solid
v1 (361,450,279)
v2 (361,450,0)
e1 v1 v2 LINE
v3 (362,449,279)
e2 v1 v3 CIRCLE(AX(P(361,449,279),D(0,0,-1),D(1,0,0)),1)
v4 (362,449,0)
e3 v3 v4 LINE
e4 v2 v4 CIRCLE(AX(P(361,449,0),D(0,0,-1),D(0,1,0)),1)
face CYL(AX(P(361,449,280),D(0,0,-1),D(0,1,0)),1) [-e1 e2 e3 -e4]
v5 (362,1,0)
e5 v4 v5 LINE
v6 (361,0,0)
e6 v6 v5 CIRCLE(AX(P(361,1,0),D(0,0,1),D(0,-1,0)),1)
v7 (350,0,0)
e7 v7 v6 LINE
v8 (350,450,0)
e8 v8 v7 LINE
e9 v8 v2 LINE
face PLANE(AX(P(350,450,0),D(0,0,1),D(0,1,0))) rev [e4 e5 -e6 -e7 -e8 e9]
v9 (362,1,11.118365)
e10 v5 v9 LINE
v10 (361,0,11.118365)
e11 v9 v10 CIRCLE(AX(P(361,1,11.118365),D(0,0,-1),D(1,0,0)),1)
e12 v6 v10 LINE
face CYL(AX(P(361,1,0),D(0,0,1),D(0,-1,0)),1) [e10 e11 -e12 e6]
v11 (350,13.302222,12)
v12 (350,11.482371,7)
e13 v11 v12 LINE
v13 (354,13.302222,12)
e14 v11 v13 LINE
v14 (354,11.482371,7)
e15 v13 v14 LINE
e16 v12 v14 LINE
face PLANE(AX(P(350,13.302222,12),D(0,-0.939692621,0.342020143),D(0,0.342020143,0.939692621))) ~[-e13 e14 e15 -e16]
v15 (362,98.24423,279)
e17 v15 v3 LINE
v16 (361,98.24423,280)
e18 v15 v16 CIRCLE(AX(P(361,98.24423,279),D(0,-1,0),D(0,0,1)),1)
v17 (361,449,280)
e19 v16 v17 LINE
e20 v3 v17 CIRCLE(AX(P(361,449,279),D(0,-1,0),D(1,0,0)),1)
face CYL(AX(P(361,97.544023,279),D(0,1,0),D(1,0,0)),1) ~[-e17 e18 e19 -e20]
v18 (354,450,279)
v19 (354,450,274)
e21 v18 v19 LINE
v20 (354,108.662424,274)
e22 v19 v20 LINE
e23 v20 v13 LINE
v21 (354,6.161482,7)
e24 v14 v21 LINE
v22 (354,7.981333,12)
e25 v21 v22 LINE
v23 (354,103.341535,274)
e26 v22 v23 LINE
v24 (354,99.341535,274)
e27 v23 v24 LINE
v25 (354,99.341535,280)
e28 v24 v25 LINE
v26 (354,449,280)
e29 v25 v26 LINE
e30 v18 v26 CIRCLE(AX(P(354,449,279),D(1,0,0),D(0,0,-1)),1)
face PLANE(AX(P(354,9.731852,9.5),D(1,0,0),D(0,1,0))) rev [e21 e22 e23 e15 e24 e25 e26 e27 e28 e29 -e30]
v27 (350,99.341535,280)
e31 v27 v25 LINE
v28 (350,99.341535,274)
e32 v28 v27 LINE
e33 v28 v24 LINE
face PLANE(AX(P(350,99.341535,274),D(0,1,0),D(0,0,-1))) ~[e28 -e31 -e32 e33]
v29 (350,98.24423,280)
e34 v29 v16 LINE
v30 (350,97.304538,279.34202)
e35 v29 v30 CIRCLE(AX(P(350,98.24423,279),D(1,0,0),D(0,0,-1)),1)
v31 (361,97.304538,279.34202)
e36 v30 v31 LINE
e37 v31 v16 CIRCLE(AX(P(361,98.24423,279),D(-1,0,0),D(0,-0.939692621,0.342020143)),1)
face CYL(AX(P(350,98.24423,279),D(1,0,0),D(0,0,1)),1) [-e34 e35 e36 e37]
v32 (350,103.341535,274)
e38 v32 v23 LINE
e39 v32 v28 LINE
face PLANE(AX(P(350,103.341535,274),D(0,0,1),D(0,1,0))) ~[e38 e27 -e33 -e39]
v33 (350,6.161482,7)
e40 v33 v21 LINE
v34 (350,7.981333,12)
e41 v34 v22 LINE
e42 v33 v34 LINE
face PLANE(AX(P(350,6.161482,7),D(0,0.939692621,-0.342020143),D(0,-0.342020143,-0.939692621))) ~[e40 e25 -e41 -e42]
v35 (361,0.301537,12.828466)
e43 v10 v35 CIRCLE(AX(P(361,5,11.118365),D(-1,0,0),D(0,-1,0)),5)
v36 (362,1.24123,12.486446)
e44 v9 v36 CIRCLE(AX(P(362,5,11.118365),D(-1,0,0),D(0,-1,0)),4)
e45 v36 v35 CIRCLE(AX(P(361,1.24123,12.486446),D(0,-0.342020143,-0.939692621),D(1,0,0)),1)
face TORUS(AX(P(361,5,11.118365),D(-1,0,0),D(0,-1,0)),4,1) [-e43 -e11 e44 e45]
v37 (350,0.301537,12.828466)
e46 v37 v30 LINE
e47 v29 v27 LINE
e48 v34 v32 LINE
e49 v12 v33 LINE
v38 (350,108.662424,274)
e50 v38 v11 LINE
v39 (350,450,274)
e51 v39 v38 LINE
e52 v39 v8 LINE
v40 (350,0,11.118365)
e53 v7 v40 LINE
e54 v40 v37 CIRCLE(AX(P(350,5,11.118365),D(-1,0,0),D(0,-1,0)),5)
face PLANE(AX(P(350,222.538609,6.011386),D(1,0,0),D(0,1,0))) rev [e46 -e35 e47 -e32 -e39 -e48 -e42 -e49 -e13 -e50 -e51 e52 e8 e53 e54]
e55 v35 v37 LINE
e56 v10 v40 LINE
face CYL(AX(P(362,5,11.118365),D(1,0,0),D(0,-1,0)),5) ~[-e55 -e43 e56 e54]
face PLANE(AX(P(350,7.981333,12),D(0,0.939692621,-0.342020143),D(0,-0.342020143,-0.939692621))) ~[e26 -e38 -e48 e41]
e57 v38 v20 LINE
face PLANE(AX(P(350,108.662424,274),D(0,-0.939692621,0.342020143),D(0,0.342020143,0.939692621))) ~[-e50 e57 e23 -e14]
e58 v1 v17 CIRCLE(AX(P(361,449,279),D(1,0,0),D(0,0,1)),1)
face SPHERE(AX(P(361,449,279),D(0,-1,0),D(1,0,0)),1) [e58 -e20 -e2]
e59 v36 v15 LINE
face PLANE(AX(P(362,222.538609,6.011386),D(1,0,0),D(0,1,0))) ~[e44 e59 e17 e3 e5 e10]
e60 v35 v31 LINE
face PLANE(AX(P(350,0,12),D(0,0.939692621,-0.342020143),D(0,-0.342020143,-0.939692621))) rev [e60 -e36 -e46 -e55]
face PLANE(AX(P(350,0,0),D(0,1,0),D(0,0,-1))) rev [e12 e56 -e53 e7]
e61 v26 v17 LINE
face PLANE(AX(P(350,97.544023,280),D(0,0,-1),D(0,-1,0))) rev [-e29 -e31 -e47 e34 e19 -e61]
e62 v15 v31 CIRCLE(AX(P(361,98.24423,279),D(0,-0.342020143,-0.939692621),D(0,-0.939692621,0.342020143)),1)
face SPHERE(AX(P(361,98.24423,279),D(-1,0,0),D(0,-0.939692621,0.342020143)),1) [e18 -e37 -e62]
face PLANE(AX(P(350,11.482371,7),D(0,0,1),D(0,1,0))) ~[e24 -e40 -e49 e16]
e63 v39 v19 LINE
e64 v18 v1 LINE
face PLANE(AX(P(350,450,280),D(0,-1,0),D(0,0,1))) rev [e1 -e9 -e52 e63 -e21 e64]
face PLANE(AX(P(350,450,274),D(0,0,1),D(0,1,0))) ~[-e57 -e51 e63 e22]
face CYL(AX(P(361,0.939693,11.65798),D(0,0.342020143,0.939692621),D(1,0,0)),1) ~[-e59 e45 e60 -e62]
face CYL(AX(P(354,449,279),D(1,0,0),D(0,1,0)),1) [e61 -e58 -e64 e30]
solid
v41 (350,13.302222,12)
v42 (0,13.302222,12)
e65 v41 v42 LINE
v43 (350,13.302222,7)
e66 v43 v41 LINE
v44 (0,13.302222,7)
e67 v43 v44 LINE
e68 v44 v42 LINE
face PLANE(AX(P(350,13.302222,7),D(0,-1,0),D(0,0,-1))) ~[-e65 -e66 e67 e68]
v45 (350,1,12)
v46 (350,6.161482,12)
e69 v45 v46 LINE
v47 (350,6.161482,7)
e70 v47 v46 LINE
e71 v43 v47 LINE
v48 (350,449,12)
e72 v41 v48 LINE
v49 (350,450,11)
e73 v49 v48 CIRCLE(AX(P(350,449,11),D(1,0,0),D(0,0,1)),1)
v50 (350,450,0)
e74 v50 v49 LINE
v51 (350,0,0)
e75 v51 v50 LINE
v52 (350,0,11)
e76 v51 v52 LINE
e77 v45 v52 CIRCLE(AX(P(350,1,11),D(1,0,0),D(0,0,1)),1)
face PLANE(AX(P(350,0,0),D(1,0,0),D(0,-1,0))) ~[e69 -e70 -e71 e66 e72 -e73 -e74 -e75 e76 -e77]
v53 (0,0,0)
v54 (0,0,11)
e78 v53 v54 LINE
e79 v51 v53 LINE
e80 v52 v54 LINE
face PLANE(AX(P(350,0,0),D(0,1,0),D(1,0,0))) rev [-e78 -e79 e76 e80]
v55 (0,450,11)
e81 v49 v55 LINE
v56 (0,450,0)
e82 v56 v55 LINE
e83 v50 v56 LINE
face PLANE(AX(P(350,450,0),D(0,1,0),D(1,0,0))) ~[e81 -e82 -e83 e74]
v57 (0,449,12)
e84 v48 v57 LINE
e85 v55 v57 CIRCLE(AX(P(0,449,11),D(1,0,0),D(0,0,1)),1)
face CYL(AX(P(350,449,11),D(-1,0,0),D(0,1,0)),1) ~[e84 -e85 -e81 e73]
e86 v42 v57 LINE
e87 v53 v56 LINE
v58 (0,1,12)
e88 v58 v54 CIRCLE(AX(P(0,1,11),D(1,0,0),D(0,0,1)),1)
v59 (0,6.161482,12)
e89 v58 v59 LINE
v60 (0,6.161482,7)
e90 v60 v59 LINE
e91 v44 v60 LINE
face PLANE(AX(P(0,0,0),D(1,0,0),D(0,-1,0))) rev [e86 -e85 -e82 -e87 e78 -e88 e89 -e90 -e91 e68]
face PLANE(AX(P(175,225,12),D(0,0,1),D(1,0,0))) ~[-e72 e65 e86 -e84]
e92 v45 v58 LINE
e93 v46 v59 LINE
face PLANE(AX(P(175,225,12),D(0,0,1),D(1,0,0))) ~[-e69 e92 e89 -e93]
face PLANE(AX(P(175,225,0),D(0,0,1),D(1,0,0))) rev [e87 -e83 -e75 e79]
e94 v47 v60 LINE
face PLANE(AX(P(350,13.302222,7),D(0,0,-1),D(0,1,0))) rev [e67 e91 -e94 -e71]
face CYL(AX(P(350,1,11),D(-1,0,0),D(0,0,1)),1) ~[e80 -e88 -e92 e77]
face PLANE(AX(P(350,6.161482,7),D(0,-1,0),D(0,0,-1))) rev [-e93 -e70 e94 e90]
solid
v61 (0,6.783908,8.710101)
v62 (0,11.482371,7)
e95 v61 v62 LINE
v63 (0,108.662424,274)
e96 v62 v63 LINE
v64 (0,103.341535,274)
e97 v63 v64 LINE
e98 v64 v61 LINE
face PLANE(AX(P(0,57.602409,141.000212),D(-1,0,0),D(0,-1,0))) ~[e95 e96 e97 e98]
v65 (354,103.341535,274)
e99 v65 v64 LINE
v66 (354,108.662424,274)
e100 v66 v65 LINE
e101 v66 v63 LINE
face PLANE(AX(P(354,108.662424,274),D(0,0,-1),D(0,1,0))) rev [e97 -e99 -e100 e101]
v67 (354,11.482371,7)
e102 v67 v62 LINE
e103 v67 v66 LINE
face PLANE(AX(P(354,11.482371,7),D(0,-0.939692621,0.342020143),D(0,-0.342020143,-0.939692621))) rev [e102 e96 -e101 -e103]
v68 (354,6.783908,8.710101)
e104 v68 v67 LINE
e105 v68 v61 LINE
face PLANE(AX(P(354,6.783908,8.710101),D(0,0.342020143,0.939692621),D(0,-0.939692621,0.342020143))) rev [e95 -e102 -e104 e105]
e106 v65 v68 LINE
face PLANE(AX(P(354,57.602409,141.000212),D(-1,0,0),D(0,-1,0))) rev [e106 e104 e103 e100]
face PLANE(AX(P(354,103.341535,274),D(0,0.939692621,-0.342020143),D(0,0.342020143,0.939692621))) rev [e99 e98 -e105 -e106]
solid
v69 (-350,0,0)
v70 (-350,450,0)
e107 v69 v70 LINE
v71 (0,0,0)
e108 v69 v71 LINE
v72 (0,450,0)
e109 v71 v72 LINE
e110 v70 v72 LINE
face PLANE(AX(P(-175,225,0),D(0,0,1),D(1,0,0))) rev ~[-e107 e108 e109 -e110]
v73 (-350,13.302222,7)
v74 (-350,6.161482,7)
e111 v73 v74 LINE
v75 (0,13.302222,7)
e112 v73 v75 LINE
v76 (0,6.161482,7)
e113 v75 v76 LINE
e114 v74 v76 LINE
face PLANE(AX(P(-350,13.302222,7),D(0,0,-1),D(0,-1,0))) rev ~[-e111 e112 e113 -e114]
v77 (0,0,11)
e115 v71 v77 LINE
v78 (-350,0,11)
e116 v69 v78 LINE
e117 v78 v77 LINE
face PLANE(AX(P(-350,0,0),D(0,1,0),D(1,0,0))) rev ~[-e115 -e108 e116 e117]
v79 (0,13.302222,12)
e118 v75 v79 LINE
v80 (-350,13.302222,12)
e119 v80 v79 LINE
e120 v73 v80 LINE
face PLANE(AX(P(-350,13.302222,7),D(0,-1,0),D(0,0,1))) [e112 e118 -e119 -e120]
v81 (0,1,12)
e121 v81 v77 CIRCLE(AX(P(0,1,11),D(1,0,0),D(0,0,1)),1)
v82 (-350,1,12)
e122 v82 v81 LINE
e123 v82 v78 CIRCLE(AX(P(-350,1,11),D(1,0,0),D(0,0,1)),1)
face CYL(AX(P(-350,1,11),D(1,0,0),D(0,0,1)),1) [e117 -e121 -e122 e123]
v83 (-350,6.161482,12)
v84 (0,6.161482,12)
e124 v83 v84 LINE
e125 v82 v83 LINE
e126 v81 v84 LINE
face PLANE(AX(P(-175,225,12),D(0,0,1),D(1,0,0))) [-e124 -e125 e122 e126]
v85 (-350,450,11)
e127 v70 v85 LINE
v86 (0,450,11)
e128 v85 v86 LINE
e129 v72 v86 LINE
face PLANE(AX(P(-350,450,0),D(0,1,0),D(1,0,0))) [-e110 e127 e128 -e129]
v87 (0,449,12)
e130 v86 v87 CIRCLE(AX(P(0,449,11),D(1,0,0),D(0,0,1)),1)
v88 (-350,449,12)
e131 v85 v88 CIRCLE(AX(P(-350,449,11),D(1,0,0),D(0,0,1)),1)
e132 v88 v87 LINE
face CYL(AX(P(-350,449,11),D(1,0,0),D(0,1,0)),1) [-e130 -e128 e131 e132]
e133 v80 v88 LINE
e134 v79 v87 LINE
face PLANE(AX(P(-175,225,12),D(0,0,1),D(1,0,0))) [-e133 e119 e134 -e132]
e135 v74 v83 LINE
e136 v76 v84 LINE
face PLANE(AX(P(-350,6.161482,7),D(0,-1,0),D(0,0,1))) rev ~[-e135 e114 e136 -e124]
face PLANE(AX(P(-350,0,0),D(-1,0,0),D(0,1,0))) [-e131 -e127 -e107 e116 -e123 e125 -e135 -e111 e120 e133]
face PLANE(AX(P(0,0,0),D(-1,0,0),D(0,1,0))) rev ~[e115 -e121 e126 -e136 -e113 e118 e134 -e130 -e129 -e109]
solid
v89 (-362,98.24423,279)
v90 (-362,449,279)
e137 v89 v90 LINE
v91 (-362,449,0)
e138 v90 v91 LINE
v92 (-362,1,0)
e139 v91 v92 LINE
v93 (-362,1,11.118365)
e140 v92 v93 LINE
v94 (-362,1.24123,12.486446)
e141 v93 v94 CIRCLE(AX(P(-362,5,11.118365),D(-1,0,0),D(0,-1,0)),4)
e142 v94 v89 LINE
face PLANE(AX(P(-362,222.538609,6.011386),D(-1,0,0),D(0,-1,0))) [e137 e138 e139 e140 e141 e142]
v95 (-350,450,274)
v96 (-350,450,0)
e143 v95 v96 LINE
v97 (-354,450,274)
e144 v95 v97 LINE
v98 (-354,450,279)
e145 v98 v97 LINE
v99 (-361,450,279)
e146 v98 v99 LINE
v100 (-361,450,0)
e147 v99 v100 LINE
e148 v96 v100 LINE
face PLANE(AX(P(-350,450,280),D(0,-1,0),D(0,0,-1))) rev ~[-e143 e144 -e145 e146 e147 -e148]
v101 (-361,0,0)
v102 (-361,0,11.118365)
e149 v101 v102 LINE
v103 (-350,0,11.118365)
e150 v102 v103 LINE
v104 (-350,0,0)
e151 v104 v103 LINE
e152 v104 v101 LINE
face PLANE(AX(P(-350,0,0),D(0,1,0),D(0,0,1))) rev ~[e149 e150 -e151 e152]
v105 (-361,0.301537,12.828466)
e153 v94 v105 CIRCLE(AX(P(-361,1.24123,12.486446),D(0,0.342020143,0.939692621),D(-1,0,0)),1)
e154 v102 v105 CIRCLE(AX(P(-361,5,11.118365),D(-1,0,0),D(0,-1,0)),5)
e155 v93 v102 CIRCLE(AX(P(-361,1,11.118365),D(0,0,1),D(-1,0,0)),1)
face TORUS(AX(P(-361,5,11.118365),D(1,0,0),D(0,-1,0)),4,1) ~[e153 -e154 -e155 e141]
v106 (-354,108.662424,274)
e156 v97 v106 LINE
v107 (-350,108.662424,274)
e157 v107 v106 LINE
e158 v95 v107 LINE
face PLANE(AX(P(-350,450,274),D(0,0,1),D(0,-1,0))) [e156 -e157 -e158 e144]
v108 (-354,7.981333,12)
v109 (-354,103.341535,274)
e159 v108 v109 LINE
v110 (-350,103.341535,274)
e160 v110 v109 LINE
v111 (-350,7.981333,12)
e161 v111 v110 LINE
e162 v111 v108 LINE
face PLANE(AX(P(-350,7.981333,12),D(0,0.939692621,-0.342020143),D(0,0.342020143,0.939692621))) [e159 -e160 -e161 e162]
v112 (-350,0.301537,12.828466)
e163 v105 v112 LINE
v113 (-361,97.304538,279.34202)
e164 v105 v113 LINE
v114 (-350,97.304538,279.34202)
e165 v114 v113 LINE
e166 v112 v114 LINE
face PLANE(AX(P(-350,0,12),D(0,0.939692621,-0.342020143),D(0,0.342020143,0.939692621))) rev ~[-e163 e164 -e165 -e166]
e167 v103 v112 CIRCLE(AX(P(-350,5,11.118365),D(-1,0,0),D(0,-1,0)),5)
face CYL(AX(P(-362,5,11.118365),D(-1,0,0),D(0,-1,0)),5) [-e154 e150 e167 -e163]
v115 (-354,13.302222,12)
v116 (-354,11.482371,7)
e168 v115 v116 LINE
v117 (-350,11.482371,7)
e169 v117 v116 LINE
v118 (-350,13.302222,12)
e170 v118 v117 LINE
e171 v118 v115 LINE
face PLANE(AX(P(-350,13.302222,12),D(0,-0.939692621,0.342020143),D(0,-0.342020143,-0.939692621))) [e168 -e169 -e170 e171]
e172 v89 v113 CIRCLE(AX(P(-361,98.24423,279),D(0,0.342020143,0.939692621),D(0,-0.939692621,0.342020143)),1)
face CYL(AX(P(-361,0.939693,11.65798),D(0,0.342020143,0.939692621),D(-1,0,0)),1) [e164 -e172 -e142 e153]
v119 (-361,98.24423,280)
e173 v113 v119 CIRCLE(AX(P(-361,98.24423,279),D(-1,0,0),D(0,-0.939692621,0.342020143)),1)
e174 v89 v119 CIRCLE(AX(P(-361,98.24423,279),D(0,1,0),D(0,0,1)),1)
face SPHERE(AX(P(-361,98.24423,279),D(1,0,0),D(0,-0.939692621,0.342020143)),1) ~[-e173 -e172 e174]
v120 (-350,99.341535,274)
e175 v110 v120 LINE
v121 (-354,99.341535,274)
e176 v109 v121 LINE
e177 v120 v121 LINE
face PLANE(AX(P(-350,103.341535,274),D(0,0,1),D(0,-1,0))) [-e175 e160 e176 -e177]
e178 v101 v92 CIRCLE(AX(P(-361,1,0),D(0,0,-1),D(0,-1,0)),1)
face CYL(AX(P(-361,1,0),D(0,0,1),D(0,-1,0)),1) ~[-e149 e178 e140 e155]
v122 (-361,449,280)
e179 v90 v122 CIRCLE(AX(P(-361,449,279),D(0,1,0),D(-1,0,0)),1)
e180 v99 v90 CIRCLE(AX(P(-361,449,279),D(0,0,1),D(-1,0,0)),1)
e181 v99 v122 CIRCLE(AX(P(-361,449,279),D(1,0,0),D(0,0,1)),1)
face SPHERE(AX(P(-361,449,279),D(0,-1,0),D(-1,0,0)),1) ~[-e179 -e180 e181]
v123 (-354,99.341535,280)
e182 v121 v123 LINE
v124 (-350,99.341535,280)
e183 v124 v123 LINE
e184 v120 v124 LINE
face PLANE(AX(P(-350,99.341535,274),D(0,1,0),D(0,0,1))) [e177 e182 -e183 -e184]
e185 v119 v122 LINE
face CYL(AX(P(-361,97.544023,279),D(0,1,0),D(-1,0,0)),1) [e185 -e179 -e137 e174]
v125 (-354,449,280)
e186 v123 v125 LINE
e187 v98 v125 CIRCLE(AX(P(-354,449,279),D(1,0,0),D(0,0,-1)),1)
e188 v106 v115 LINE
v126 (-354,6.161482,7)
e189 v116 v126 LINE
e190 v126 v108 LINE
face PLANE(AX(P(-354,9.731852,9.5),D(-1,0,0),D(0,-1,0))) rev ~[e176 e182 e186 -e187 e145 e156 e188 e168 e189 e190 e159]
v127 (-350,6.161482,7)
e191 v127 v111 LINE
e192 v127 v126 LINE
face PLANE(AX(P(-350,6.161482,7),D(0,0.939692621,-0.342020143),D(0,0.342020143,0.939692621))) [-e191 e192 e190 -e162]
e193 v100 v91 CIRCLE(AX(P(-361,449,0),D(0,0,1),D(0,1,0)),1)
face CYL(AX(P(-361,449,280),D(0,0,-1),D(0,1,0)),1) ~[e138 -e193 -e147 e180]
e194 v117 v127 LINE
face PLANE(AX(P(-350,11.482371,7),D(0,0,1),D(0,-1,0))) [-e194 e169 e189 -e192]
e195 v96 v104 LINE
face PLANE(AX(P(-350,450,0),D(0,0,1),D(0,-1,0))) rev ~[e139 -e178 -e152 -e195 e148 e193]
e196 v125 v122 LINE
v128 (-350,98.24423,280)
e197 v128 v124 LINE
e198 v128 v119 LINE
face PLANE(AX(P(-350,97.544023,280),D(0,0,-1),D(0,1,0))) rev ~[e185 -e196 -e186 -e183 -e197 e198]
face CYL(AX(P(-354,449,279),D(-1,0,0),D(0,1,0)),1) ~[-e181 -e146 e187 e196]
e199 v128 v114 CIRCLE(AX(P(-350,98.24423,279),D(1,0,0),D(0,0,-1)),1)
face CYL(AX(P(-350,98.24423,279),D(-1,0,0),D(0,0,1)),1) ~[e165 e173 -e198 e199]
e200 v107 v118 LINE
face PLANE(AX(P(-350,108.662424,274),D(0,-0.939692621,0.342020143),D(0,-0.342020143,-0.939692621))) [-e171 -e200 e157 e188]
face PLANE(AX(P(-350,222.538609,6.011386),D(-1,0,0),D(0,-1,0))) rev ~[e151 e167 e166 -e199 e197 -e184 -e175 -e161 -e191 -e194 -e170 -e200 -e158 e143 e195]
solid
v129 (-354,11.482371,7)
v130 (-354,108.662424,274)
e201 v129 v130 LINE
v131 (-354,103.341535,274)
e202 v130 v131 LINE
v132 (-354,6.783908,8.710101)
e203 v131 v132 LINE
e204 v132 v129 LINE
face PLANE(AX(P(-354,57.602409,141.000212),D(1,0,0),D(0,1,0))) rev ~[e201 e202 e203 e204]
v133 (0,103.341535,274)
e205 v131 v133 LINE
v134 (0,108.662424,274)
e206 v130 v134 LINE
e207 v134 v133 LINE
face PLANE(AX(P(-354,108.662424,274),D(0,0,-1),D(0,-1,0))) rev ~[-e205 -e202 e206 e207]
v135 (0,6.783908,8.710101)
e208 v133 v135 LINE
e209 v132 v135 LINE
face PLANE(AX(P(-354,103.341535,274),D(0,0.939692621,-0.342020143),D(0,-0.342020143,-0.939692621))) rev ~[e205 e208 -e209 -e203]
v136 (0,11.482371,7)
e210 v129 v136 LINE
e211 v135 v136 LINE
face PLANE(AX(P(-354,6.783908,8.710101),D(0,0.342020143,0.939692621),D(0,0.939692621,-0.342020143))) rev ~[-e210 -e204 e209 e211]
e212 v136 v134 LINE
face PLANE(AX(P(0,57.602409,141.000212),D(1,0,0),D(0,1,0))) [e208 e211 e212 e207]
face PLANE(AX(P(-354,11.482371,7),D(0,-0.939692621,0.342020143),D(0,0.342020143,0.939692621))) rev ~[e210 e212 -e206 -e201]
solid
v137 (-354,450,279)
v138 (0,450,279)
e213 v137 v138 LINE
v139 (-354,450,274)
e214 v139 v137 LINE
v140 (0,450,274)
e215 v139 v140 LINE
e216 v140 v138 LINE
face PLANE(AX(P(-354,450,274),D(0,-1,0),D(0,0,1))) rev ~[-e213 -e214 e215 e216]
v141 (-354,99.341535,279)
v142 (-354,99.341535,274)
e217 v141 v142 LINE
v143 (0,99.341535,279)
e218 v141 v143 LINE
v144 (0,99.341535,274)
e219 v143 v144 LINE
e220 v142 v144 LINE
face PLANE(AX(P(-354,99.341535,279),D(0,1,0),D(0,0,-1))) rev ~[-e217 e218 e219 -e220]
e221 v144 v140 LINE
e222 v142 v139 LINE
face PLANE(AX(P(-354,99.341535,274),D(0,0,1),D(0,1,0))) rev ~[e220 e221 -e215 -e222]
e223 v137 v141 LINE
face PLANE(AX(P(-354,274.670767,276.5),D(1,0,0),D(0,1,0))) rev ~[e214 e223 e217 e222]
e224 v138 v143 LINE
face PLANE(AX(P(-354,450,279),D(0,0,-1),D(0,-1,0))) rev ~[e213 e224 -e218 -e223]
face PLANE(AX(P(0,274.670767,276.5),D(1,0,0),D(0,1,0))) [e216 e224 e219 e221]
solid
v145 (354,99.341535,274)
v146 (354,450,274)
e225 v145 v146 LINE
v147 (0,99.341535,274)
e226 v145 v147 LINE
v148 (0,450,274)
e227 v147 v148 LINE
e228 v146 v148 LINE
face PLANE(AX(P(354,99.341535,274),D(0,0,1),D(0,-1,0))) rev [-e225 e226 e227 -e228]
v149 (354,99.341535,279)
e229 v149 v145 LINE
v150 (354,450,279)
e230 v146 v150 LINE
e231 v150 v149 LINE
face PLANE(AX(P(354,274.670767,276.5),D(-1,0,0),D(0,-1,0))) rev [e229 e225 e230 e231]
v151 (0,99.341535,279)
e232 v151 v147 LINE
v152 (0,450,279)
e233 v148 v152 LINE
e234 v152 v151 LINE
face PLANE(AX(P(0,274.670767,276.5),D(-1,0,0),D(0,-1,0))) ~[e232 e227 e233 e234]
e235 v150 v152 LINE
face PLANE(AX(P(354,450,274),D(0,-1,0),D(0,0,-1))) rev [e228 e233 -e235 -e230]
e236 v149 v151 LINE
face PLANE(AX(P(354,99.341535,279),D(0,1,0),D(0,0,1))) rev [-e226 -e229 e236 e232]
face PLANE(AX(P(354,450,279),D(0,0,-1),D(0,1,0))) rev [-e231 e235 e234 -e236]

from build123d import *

# Parameters (mm, degrees)
F2_W         = 350
F2_H         = 450
F3_DEPTH     = 12
F5_DEPTH     = 12
F6_DEPTH     = 4
F8_DEPTH     = 354
F9_DEPTH     = 354
F10_W        = 7.1407400337
F10_H        = 5
F11_DEPTH    = 350.001
F12_R        = 1
F12_2_R      = 1
F13_T1_DEPTH = 14.2040872589
F13_T4_ANGLE = 20


# Not quite as in the source:
# - a fillet or chamfer that OpenCascade refuses, or shapes differently, is made with other operations: its cross-section is extruded or revolved along the edge and cut away or added


with BuildPart() as f3:
    # F2 (on Top) → F3 (new body)
    with BuildSketch(Plane.XY):
        with Locations((-175, 225)):
            Rectangle(F2_W, F2_H)
    extrude(amount=F3_DEPTH)

    # F10 (on face) → F11 (cut, through all)
    with BuildSketch(Plane(origin=(-350, 0, 0), x_dir=(0, -1, 0), z_dir=(-1, 0, 0))):
        with Locations((-9.7318521391, 9.5)):
            Rectangle(F10_W, F10_H)
    extrude(amount=-F11_DEPTH, mode=Mode.SUBTRACT)

    # F12
    f12_edges = [f3.edges().sort_by_distance(p)[0] for p in [
        (-175, 0, 12),
        (-175, 450, 12),
    ]]
    fillet(f12_edges, radius=F12_R)


with BuildPart() as f5:
    # F4 (on face) → F5 (new body)
    with BuildSketch(Plane(origin=(-350, 0, 0), x_dir=(0, -1, 0), z_dir=(-1, 0, 0))):
        Polygon((-450, 12), (-450, 0), (0, 0), (0, 12), (-7.9813332936, 12), (-6.1614821222, 7), (-11.4823709846, 7), (-13.3022221559, 12), align=None)
        Polygon((-7.9813332936, 12), (-13.3022221559, 12), (-11.4823709846, 7), (-6.1614821222, 7), align=None)
        Polygon((-7.9813332936, 12), (0, 12), (-97.5440227833, 280), (-99.3415346713, 280), (-99.3415346713, 274), (-103.3415346713, 274), align=None)
        Polygon((-108.6624235337, 274), (-13.3022221559, 12), (-7.9813332936, 12), (-103.3415346713, 274), align=None)
        Polygon((-450, 274), (-450, 12), (-13.3022221559, 12), (-108.6624235337, 274), align=None)
        Polygon((-99.3415346713, 274), (-99.3415346713, 280), (-105.5253560769, 280), (-103.3415346713, 274), align=None)
        Polygon((-110.8462449393, 280), (-108.6624235337, 274), (-103.3415346713, 274), (-105.5253560769, 280), align=None)
        Polygon((-450, 280), (-450, 274), (-108.6624235337, 274), (-110.8462449393, 280), align=None)
    extrude(amount=F5_DEPTH)

    # F4 (on face) → F6 (cut)
    with BuildSketch(Plane(origin=(-350, 0, 0), x_dir=(0, -1, 0), z_dir=(-1, 0, 0))):
        Polygon((-7.9813332936, 12), (-13.3022221559, 12), (-11.4823709846, 7), (-6.1614821222, 7), align=None)
        Polygon((-108.6624235337, 274), (-13.3022221559, 12), (-7.9813332936, 12), (-103.3415346713, 274), align=None)
        Polygon((-99.3415346713, 274), (-99.3415346713, 280), (-105.5253560769, 280), (-103.3415346713, 274), align=None)
        Polygon((-110.8462449393, 280), (-108.6624235337, 274), (-103.3415346713, 274), (-105.5253560769, 280), align=None)
        Polygon((-450, 280), (-450, 274), (-108.6624235337, 274), (-110.8462449393, 280), align=None)
    extrude(amount=F6_DEPTH, mode=Mode.SUBTRACT)

    # F12#2
    f12_2_edges = [f5.edges().sort_by_distance(p)[0] for p in [
        (-362, 48.772011, 146),
        (-362, 273.772011, 280),
        (-356, 97.544023, 280),
        (-362, 450, 140),
        (-362, 0, 6),
        (-358, 450, 280),
    ]]
    fillet(f12_2_edges, radius=F12_2_R)

    # F13: fillet of radius 5 on 1 edges, made by hand

    # F13_s2 → F13_t1 (cut)
    with BuildSketch(Plane.YZ.offset(-362)):
        with BuildLine():
            ThreePointArc((0, 11.1183650965), (0.0759612349, 11.9866059848), (0.3015368961, 12.8284658131))
            Line((0.3015368961, 12.8284658131), (0, 12))
            Line((0, 12), (0, 11.1183650965))
        make_face()
    extrude(amount=F13_T1_DEPTH, mode=Mode.SUBTRACT)

    # F13_s3 → F13_t4 (revolve, cut)
    with BuildSketch(Plane.XY.offset(11.1183650965)):
        with BuildLine():
            ThreePointArc((-362, 1), (-361.7071067812, 0.2928932188), (-361, 0))
            Line((-361, 0), (-362, 0))
            Line((-362, 0), (-362, 1))
        make_face()
    revolve(axis=Axis((-362, 5, 11.1183650965), (-1, 0, 0)), revolution_arc=F13_T4_ANGLE, mode=Mode.SUBTRACT)


with BuildPart() as f8:
    # F7 (on face) → F8 (new body)
    with BuildSketch(Plane.YZ.offset(-354)):
        Polygon((103.3415346713, 274), (6.7839078807, 8.7101007166), (11.4823709846, 7), (108.6624235337, 274), align=None)
    extrude(amount=F8_DEPTH)


with BuildPart() as f9:
    # F7 (on face) → F9 (new body)
    with BuildSketch(Plane.YZ.offset(-354)):
        Polygon((99.3415346713, 274), (103.3415346713, 274), (108.6624235337, 274), (450, 274), (450, 279), (99.3415346713, 279), align=None)
    extrude(amount=F9_DEPTH)


with BuildPart() as f14_1:
    # F14: instance of F5
    add(f5.part.mirror(Plane(origin=(0, 226.4328970627, 5.9762405928), x_dir=(0, 1, 0), z_dir=(1, 0, 0))))


with BuildPart() as f14_2:
    # F14: instance of F9
    add(f9.part.mirror(Plane(origin=(0, 226.4328970627, 5.9762405928), x_dir=(0, 1, 0), z_dir=(1, 0, 0))))


with BuildPart() as f14_3:
    # F14: instance of F3
    add(f3.part.mirror(Plane(origin=(0, 226.4328970627, 5.9762405928), x_dir=(0, 1, 0), z_dir=(1, 0, 0))))


with BuildPart() as f14_4:
    # F14: instance of F8
    add(f8.part.mirror(Plane(origin=(0, 226.4328970627, 5.9762405928), x_dir=(0, 1, 0), z_dir=(1, 0, 0))))


solid = Compound([f3.part, f5.part, f8.part, f9.part, f14_1.part, f14_2.part, f14_3.part, f14_4.part])
